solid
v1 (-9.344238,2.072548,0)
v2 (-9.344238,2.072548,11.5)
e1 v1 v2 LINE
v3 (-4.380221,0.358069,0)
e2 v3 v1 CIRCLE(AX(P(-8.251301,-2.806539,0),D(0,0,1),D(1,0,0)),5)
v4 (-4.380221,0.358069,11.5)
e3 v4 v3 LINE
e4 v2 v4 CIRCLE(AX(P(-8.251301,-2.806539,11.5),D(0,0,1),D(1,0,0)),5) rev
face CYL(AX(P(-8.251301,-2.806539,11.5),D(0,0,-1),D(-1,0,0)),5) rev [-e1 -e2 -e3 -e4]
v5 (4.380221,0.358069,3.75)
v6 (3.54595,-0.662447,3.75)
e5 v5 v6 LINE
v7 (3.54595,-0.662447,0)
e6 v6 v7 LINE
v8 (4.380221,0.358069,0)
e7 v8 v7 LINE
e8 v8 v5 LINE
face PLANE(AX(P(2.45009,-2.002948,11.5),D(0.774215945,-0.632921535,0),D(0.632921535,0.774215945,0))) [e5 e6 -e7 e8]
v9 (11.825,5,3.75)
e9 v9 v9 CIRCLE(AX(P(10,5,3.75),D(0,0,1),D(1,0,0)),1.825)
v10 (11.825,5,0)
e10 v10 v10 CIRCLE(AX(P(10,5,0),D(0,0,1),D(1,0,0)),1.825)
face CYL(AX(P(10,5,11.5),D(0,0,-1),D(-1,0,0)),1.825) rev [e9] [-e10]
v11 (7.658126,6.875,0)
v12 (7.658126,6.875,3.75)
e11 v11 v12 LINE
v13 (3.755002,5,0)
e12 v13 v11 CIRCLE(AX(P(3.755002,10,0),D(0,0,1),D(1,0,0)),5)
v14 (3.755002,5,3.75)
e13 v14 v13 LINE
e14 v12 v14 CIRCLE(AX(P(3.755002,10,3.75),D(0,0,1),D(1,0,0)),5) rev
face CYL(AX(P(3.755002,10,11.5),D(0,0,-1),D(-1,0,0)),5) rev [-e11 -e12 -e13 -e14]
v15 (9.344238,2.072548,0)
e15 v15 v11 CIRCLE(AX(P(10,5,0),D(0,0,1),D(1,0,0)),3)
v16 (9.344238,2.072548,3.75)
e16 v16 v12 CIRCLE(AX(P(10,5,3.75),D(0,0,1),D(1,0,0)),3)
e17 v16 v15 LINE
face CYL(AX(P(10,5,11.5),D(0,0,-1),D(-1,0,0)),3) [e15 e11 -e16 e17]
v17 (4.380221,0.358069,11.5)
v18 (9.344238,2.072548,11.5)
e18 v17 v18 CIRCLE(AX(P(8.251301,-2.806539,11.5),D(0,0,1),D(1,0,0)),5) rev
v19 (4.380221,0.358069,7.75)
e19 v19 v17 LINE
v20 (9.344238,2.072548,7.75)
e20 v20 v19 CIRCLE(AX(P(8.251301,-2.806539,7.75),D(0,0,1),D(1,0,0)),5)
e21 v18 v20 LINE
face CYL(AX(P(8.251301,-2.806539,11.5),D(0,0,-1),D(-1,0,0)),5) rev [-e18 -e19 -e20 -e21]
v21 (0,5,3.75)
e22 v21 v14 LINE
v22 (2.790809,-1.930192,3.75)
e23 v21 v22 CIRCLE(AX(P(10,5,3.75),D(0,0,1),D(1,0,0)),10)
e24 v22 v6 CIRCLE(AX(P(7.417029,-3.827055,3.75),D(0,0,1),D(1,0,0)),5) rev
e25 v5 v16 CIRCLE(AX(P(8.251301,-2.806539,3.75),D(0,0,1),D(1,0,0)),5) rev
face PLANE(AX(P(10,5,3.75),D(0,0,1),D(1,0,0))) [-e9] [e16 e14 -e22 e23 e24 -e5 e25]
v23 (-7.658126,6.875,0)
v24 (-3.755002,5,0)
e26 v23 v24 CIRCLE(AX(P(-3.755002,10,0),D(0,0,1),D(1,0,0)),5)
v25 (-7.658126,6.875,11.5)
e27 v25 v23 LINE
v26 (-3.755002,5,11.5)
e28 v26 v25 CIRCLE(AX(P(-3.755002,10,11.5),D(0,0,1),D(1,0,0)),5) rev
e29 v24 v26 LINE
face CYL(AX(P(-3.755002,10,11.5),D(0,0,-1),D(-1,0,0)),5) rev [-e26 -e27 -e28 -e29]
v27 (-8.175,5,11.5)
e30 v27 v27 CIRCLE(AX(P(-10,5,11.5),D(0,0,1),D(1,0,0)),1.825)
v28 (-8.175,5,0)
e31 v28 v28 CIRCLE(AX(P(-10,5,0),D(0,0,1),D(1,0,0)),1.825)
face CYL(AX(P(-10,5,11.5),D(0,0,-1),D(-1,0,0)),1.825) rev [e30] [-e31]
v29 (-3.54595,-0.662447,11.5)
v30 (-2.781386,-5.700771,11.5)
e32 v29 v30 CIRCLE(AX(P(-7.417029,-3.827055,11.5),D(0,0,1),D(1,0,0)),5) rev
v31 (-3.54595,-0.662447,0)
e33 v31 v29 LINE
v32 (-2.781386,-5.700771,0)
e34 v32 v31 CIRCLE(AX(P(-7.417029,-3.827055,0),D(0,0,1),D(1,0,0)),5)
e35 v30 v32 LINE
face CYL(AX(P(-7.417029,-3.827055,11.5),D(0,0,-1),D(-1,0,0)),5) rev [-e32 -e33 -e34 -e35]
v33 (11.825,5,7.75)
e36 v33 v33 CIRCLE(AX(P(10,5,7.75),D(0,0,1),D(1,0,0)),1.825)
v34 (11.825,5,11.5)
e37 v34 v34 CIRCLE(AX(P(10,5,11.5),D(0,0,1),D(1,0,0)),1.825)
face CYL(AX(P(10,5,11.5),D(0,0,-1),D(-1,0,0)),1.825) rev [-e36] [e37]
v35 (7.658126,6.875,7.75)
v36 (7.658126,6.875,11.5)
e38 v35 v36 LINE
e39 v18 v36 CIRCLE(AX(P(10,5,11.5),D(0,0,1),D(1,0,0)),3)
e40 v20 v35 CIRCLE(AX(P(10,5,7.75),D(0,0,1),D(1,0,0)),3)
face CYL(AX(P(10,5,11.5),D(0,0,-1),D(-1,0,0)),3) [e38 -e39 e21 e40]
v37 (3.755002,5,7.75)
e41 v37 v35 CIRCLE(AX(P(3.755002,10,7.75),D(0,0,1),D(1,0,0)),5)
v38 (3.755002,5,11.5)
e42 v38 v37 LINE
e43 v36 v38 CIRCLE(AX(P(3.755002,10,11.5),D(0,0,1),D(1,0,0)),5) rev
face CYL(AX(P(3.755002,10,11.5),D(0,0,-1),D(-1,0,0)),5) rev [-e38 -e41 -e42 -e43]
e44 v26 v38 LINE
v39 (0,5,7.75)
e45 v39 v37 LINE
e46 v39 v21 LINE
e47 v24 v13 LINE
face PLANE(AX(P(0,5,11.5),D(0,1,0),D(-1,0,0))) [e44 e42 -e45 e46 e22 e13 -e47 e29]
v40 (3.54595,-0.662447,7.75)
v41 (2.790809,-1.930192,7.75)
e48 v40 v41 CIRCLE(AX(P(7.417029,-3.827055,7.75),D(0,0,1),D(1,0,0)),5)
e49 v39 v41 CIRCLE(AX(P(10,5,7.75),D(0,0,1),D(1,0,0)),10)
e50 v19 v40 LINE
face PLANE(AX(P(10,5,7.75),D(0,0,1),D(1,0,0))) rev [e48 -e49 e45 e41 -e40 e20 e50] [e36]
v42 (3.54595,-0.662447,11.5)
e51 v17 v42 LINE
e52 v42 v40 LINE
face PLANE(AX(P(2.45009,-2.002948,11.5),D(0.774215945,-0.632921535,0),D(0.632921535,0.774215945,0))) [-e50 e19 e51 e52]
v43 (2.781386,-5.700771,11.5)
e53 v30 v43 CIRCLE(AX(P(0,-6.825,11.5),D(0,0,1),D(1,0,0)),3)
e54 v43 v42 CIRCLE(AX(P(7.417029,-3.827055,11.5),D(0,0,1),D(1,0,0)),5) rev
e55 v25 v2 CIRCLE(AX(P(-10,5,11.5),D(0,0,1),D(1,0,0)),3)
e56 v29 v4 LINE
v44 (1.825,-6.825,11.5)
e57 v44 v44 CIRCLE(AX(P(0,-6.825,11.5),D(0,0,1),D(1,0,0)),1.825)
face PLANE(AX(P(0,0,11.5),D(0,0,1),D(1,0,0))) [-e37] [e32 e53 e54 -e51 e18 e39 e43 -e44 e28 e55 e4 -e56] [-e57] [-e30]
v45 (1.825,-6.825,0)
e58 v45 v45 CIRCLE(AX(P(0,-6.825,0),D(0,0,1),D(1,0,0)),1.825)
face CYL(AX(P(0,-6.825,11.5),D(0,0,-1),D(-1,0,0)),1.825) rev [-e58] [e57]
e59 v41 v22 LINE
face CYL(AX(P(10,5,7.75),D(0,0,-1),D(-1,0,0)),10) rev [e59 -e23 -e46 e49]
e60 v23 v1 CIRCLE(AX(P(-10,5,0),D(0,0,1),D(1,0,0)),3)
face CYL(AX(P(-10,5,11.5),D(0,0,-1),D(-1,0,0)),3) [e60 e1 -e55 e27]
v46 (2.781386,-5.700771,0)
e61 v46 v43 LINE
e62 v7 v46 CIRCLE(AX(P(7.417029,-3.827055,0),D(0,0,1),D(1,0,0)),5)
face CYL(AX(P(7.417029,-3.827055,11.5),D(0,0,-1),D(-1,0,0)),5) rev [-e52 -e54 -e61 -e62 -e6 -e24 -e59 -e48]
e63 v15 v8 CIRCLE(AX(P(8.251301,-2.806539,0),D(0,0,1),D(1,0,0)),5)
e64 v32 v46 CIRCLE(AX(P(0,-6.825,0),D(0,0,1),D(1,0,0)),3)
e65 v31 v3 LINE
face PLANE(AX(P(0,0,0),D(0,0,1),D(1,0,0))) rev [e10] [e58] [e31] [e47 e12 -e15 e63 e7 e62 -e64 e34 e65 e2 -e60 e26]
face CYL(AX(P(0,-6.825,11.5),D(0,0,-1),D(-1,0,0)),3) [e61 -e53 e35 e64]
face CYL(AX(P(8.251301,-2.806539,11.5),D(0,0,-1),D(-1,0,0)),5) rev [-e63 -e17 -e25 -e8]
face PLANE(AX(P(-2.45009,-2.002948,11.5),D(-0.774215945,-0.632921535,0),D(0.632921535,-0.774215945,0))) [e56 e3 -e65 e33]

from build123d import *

# Parameters (mm, degrees)
ESQUISSE2_R             = 3
ESQUISSE2_R_2           = 1.825
BOSS_EXTRU_1_DEPTH      = 11.5
ESQUISSE3_R             = 10
ENL_V_MAT_EXTRU_1_DEPTH = 4
CONG_1_R                = 5
FILLET1_R               = 5


with BuildPart() as part:
    # Esquisse2 → Boss.-Extru.1 (new body)
    # profile 1 of 4: a face of its own
    with BuildSketch(Plane.XY):
        with Locations((-10, 5)):
            Circle(ESQUISSE2_R)
        with Locations((-10, 5)):
            Circle(ESQUISSE2_R_2, mode=Mode.SUBTRACT)
    # profile 2 of 4: a face of its own
    with BuildSketch(Plane.XY):
        with Locations((10, 5)):
            Circle(ESQUISSE2_R)
        with Locations((10, 5)):
            Circle(ESQUISSE2_R_2, mode=Mode.SUBTRACT)
    # profile 3 of 4: a face of its own
    with BuildSketch(Plane.XY):
        with Locations((0, -6.825)):
            Circle(ESQUISSE2_R)
        with Locations((0, -6.825)):
            Circle(ESQUISSE2_R_2, mode=Mode.SUBTRACT)
    # profile 4 of 4: a face of its own
    with BuildSketch(Plane.XY):
        Polygon((-8.175, 5), (8.175, 5), (0, -5), align=None)
    extrude(amount=BOSS_EXTRU_1_DEPTH)

    # Esquisse3 → Enlèv. mat.-Extru.1 (cut)
    with BuildSketch(Plane.XY.offset(3.75)):
        with Locations((10, 5)):
            Circle(ESQUISSE3_R)
    extrude(amount=ENL_V_MAT_EXTRU_1_DEPTH, mode=Mode.SUBTRACT)

    # Congé1
    # the kernel refuses this fillet: 5 mm, written as the material it adds along each edge
    with BuildSketch(Plane(origin=(-7, 5, 0), x_dir=(-0.3311912213512006, 0.9435636570469954, 0), z_dir=(0, 0, 1))) as cong_1_piece_1:
        with BuildLine():
            CenterArc((3.643103435, -4.717818285), CONG_1_R, 109.341093727, 51.317812547)
            Line((-1.07471485, -3.061862178), (0, 0))
            ThreePointArc((0, 0), (0.993573664, -0.169309029), (1.987147328, 0))
        make_face()
    extrude(amount=11.5)
    with BuildSketch(Plane(origin=(-7.231093941, 3.845374851, 11.5), x_dir=(-0.7661000074497634, -0.6427213848826507, 0), z_dir=(0, 0, -1))) as cong_1_piece_2:
        with BuildLine():
            CenterArc((5.056907819, -4.440322454), CONG_1_R, 117.368969646, 63.360078756)
            Line((0.057312583, -4.503942212), (0, 0))
            ThreePointArc((0, 0), (1.379156678, -0.335806528), (2.758313356, 0))
        make_face()
    extrude(amount=11.5)
    with BuildSketch(Plane(origin=(-0.858096974, -3.950340093, 11.5), x_dir=(-0.6329215353519139, 0.7742159453846039, 0), z_dir=(0, 0, -1))) as cong_1_piece_3:
        with BuildLine():
            CenterArc((4.246739065, -5), CONG_1_R, 90, 61.27443838)
            ThreePointArc((-0.137920096, -2.596926126), (0.227062491, -1.314184518), (0, 0))
            Line((0, 0), (4.246739065, 0))
        make_face()
    extrude(amount=11.5)
    with BuildSketch(Plane(origin=(7.231093941, 3.845374851, 11.5), x_dir=(-0.6329215353519138, -0.774215945384604, 0), z_dir=(0, 0, -1))) as cong_1_piece_4:
        with BuildLine():
            CenterArc((4.504306848, -5), CONG_1_R, 90, 63.360078756)
            ThreePointArc((0.035096646, -2.758090063), (0.353327666, -1.374772245), (0, 0))
            Line((0, 0), (4.504306848, 0))
        make_face()
    extrude(amount=3.75)
    with BuildSketch(Plane(origin=(7, 5, 11.5), x_dir=(-1, 0, 0), z_dir=(0, 0, -1))) as cong_1_piece_5:
        with BuildLine():
            CenterArc((3.244997998, 5), CONG_1_R, 218.682187453, 51.317812547)
            ThreePointArc((-0.658125751, 1.875), (-0.169309029, 0.993573664), (0, 0))
            Line((0, 0), (3.244997998, 0))
        make_face()
    extrude(amount=3.75)
    with BuildSketch(Plane(origin=(0.858096974, -3.950340093, 11.5), x_dir=(0.7395598752725667, -0.6730907746261462, 0), z_dir=(0, 0, -1))) as cong_1_piece_6_section:
        with BuildLine():
            CenterArc((4.767740899, -4.505933799), CONG_1_R, 115.685497342, 61.27443838)
            Line((-0.225222573, -4.240762606), (0, 0))
            ThreePointArc((0, 0), (1.300292973, -0.29643972), (2.600585945, 0))
        make_face()
    cong_1_piece_6 = extrude(amount=11.5, mode=Mode.PRIVATE)
    cong_1_piece_6 = cong_1_piece_6 - Plane(origin=(10, 5, 9.625), x_dir=(1, 0, 0), z_dir=(0, 0, -1)) * Cylinder(10, 40, mode=Mode.PRIVATE)
    add(cong_1_piece_6)
    with BuildSketch(Plane(origin=(0.858096974, -3.950340093, 11.5), x_dir=(0.7395598752725667, -0.6730907746261462, 0), z_dir=(0, 0, -1))) as cong_1_piece_7_section:
        with BuildLine():
            CenterArc((4.767740899, -4.505933799), CONG_1_R, 115.685497342, 61.27443838)
            Line((-0.225222573, -4.240762606), (0, 0))
            ThreePointArc((0, 0), (1.300292973, -0.29643972), (2.600585945, 0))
        make_face()
    cong_1_piece_7 = extrude(amount=22.116847663, mode=Mode.PRIVATE)
    cong_1_piece_7 = split(cong_1_piece_7, bisect_by=Plane(origin=(2.909028405, -1.544063306, 7.75), z_dir=(0, 0, 1)), keep=Keep.TOP, mode=Mode.PRIVATE)
    add(cong_1_piece_7)
    with BuildSketch(Plane(origin=(0.858096974, -3.950340093, 22.116847663), x_dir=(0.7395598752725666, -0.6730907746261463, 0), z_dir=(0, 0, -1))) as cong_1_piece_8_section:
        with BuildLine():
            CenterArc((4.767740899, -4.505933799), CONG_1_R, 115.685497342, 61.27443838)
            Line((-0.225222573, -4.240762606), (0, 0))
            ThreePointArc((0, 0), (1.300292973, -0.29643972), (2.600585945, 0))
        make_face()
    cong_1_piece_8 = extrude(amount=22.116847663, mode=Mode.PRIVATE)
    cong_1_piece_8 = split(cong_1_piece_8, bisect_by=Plane(origin=(2.909028405, -1.544063306, 3.75), z_dir=(0, 0, -1)), keep=Keep.TOP, mode=Mode.PRIVATE)
    add(cong_1_piece_8)

    # Fillet1
    fillet1_edges = [part.edges().sort_by_distance(p)[0] for p in [
        (7.231093941, 3.845374851, 1.875),
        (7, 5, 1.875),
    ]]
    fillet(fillet1_edges, radius=FILLET1_R)


solid = part.part
